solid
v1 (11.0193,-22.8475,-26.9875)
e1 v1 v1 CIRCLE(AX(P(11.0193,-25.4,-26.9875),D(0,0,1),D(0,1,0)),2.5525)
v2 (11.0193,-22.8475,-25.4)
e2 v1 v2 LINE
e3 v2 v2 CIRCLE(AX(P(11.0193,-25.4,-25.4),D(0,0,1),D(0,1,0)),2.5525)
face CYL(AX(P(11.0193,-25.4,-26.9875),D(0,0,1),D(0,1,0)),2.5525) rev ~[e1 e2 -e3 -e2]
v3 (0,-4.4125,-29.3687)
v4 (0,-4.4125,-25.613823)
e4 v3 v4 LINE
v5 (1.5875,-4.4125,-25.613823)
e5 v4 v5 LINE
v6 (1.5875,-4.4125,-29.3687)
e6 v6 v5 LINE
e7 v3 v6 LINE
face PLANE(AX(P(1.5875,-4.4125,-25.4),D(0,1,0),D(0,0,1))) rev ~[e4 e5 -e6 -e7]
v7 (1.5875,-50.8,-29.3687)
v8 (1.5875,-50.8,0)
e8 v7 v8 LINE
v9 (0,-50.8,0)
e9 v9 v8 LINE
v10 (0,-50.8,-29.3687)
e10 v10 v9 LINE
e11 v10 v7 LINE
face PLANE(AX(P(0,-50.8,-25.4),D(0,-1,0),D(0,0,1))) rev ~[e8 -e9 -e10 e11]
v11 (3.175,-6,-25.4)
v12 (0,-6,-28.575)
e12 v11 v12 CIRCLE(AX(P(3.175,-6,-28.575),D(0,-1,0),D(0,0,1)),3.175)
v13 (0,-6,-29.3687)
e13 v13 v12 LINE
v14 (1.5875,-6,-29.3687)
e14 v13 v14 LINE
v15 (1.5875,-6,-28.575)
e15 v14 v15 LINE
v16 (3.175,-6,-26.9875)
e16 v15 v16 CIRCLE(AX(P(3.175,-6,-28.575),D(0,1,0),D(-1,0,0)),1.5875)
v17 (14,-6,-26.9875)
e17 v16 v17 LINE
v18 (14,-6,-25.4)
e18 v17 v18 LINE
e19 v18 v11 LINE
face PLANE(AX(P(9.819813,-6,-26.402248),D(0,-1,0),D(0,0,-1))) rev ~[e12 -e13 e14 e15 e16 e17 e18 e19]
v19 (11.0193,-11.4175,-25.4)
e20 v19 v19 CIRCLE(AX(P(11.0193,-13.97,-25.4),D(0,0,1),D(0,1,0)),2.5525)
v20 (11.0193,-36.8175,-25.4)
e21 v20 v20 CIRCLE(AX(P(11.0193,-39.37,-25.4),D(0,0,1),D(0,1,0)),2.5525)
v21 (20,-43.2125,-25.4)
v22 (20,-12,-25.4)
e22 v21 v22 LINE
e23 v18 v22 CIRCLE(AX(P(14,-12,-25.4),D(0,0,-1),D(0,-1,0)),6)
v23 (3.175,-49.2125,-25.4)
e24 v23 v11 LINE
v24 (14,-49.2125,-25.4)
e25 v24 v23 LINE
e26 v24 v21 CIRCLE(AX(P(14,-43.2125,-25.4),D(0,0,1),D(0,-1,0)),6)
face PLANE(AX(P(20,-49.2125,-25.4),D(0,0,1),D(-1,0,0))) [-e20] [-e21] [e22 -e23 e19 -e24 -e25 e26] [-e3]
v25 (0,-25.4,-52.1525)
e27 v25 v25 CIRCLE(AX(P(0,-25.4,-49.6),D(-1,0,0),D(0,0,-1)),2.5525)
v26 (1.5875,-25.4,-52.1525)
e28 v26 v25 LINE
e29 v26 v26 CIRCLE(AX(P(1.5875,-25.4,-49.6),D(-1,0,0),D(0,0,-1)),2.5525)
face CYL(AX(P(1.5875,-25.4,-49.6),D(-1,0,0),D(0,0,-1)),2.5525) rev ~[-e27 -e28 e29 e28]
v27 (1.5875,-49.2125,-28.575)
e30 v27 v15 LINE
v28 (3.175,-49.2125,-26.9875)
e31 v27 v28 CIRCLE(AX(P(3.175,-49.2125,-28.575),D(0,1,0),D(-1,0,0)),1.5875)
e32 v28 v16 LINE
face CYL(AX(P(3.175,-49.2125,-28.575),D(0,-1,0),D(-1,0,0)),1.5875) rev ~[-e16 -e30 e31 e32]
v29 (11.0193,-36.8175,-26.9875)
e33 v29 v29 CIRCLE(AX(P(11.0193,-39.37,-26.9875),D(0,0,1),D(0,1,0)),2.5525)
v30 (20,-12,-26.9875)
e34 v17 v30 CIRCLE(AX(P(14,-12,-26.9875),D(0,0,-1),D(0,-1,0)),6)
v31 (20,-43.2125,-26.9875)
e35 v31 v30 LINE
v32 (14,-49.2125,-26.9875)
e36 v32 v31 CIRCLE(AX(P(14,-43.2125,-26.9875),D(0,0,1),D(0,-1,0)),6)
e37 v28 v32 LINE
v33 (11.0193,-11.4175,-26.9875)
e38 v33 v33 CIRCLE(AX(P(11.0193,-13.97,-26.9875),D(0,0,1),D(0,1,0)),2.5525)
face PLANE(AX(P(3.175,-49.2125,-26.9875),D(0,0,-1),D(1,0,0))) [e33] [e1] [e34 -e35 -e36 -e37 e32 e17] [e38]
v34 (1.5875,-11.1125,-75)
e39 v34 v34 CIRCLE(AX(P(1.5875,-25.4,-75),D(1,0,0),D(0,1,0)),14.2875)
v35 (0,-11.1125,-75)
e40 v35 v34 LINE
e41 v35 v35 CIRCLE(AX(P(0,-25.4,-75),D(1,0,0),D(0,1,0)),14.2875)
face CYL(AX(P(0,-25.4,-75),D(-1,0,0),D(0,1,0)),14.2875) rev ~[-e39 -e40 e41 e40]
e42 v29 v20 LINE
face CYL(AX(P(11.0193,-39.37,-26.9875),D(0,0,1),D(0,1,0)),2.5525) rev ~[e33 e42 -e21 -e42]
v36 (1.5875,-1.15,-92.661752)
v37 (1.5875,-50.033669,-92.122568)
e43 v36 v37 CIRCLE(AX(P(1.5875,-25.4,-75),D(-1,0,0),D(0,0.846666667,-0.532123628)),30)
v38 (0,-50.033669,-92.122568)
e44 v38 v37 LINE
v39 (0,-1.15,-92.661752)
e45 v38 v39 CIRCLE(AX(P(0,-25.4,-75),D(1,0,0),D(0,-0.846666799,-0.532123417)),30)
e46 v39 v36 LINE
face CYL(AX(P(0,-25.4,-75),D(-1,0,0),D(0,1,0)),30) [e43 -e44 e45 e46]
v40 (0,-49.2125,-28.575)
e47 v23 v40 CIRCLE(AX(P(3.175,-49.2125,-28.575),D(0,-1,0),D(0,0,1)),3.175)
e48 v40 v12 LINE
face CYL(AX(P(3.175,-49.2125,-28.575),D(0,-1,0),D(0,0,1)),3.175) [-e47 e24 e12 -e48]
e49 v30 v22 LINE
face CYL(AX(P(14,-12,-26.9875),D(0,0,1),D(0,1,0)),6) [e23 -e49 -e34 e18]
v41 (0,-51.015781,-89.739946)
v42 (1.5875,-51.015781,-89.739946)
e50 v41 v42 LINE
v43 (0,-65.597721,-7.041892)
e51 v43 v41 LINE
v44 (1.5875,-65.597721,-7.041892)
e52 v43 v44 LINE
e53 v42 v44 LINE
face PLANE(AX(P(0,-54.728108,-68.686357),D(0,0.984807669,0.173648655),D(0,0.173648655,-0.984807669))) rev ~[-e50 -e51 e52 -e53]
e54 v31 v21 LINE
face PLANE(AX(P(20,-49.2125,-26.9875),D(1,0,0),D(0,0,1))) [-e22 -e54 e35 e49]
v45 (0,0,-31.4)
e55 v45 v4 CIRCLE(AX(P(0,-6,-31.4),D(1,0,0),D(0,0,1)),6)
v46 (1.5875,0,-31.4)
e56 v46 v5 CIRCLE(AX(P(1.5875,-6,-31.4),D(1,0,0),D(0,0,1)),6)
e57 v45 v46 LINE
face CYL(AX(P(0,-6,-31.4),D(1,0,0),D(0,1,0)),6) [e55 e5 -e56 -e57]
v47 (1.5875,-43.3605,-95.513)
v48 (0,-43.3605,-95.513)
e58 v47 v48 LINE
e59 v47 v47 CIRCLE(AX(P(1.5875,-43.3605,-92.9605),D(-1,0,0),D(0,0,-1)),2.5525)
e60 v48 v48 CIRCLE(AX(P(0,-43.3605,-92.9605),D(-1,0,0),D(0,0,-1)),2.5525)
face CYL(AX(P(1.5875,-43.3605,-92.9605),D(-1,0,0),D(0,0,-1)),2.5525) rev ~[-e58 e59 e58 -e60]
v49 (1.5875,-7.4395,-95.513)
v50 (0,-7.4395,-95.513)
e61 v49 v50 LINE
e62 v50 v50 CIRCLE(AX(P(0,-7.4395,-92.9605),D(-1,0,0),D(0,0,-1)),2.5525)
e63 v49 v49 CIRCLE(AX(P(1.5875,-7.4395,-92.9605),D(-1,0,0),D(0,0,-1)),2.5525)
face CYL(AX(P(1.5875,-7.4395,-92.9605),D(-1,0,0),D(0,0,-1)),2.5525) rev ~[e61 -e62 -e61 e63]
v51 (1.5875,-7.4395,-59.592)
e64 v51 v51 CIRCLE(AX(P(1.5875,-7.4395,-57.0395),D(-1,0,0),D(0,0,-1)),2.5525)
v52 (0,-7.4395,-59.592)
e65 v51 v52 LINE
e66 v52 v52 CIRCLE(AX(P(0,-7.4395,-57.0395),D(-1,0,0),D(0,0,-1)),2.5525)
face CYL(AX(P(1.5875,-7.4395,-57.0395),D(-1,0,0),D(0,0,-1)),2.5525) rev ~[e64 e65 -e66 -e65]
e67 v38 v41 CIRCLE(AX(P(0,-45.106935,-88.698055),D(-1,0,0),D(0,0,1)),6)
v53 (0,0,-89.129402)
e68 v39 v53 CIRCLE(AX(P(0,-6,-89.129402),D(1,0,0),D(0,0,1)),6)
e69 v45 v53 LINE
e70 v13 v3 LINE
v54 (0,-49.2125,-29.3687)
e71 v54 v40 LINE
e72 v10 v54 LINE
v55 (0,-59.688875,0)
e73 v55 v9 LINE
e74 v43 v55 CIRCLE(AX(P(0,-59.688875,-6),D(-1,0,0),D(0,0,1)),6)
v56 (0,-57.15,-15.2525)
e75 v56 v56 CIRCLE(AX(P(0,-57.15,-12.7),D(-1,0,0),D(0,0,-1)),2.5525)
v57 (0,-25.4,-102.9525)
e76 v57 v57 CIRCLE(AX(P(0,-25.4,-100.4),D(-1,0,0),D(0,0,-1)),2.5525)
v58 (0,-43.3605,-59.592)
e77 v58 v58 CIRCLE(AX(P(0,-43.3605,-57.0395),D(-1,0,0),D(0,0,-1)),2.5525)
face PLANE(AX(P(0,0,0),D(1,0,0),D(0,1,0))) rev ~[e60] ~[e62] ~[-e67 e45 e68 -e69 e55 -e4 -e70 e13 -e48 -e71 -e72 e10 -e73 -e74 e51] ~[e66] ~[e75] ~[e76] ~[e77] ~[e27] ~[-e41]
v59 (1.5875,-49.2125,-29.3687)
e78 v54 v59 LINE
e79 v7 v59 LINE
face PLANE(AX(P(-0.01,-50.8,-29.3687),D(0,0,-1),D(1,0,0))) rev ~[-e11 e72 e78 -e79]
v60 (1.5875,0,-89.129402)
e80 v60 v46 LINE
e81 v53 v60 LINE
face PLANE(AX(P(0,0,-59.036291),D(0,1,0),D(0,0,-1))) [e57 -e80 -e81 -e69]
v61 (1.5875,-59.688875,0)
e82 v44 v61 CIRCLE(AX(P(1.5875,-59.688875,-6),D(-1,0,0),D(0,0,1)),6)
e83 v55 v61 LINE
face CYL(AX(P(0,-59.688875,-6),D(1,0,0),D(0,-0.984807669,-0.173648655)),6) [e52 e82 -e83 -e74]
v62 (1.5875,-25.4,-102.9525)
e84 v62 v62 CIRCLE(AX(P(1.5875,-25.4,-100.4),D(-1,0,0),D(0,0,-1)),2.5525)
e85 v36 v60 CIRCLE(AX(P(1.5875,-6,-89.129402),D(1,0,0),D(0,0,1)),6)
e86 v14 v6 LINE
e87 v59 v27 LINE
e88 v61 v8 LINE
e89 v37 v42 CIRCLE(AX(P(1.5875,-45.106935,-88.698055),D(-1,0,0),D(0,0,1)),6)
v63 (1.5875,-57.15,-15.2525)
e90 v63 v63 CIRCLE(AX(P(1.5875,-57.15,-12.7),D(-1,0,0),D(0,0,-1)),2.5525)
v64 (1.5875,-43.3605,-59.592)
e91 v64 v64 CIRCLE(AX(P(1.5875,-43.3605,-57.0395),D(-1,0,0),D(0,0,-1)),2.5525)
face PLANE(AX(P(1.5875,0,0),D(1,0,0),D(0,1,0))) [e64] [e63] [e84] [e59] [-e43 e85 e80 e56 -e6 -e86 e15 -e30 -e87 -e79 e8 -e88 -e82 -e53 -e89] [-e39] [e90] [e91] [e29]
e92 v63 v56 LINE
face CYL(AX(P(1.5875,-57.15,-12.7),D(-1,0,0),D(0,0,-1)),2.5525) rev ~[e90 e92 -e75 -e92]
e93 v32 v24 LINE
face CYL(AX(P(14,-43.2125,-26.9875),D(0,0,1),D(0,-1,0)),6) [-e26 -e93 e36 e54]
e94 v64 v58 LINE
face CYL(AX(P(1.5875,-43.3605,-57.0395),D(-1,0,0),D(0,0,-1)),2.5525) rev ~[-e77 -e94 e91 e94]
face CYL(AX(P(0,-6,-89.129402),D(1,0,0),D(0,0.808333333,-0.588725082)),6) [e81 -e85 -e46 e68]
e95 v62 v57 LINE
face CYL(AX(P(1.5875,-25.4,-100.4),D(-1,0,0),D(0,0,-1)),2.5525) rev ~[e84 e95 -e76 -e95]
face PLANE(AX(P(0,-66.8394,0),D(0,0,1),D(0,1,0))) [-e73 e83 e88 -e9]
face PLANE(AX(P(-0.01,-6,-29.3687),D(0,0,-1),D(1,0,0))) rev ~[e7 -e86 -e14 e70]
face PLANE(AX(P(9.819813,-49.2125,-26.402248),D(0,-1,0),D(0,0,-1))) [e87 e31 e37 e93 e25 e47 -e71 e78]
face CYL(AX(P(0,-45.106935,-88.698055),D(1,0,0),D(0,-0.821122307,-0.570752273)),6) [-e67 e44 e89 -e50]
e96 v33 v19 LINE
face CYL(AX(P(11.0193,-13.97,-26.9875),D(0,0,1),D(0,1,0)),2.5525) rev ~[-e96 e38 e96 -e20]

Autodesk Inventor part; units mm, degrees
ref_plane "YZ Plane" through (0, 0, 0) normal (1, 0, 0) x (0, 1, 0)
ref_plane "XZ Plane" through (0, 0, 0) normal (0, 1, 0) x (-1, 0, 0)
ref_plane "XY Plane" through (0, 0, 0) normal (0, 0, 1) x (1, 0, 0)
sketch "Sketch1" plane through (0, 0, 0) normal (1, 0, 0) x (0, 1, 0)
  line L0 (-39.3892, -105) -> (-110, -20.8494)
  line L1 (-110, -20.8494) -> (-110, 0)
  line L2 (-110, 0) -> (0, 0)
  line L3 (0, 0) -> (0, -105)
  line L4 (0, -105) -> (-39.3892, -105)
  line L5 (-110, -20.8494) -> (-119.38, 0) construction
  line L6 (-119.38, 0) -> (-110, 0) construction
  line L7 (-50.8, -25.4) -> (0, -25.4) construction
  line L8 (0, -25.4) -> (0, 0) construction
  line L9 (0, 0) -> (-50.8, 0) construction
  line L10 (-50.8, 0) -> (-50.8, -25.4) construction
  line L11 (-50.8, -25.4) -> (0, 0) construction
  line L12 (0, -25.4) -> (-50.8, 0) construction
  circle A0 centre (-12.7, -12.7) radius 3
  circle A1 centre (-38.1, -12.7) radius 3
  circle A2 centre (-25.4, -75) radius 14.2875
  circle A3 centre (-25.4, -75) radius 30
  line L13 (-50.8, -90.9637) -> (-50.8, -59.0363)
  line L14 (-50.8, -25.4) -> (0, -25.4)
  line L15 (-66.8394, 0) -> (-50.8, -90.9637)
  line L16 (-50.8, -25.4) -> (-50.8, 0)
  point P0 (-25.4, -12.7)
  point P1 (-25.4, -25.4)
  point P2 (-50.8, -75)
  point P3 (0, -90.9637)
  point P4 (0, -25.4)
  point P5 (-50.8, 0)
  dimension "d0" = 50
  dimension "d1" = 119.38
  dimension "d2" = 50.8
  dimension "d3" = 25.4
  dimension "d4" = 25.4
  dimension "d5" = 12.7
  dimension "d6" = 6
  dimension "d7" = 6
  dimension "d11" = 75
  dimension "d13" = 110
  dimension "d16" = 60
  dimension "d17" = 25.4
  dimension "d18" = 25.4
  dimension "d31" = 28.575
  dimension "d33" = 10
extrude "Plate1" add sketch "Sketch1" along normal blind 1.5875 contours A3 L13 L3 | L15 A3 L13 | L15 L2 L16 L14 L3 A3
fillet "Corner Round2" radius 6 4 edges at (0.7937, 0, -90.9637) (0.7937, -50.8, -90.9637) (0.7937, 0, -25.4) (0.7937, -66.8394, 0)
sketch "Sketch3" plane through (0, -50.8, -26.9875) normal (0, 0, 1) x (1, 0, 0)
  line L0 (0, 44.8) -> (0, 1.5875)
  line L1 (0, 1.5875) -> (20, 1.5875)
  line L2 (20, 1.5875) -> (20, 44.8)
  line L3 (20, 44.8) -> (0, 44.8)
edge flange "Flange1" height 20 angle 90 thickness 1.5875 bend radius 1.5875 thickness toward (0, 0, 1) relief straight relief width 1.5875 relief depth 0.7937 edges at (1.5875, -28.4, -25.4) wall of the first edge with corners at (0, -6, -26.9875) (0, -49.2125, -26.9875) (20, -49.2125, -26.9875) (20, -6, -26.9875)
bend "Bend1"
corner "Corner1"
sketch "Sketch4" plane through (1.5875, 0, 0) normal (1, 0, 0) x (0, 0, -1)
  circle A0 centre (75, -25.4) radius 14.2875 projected
  point P0 (0, 0)
  point P1 (100.4, -25.4)
  point P2 (92.9605, -7.4395)
  point P3 (75, 0)
  point P4 (57.0395, -7.4395)
  point P5 (49.6, -25.4)
  point P6 (57.0395, -43.3605)
  point P7 (75, -50.8)
  point P8 (92.9605, -43.3605)
  dimension "d45" = 25.4
  dimension "d48" = 360
hole "Hole2" at (1.5875, -25.4, -100.4) at (1.5875, -7.4395, -92.9605) at (1.5875, -7.4395, -57.0395) at (1.5875, -25.4, -49.6) at (1.5875, -43.3605, -57.0395) at (1.5875, -43.3605, -92.9605) direction (-1, 0, 0) diameter 5.105 depth 1.5875 tip angle 118 clearance for "Flat Head Machine Screw (82)" size "#10" standard "Ansi Unified Screw Threads"
sketch "Sketch5" plane through (20, -49.2125, -26.9875) normal (0, 0, -1) x (-1, 0, 0)
  line L0 (0, 0) -> (16.825, 0) projected
  line L1 (16.825, 0) -> (16.825, 43.2125) projected
  point P0 (20, 49.2125)
  point P1 (8.9807, 9.8425)
  point P2 (8.9807, 35.2425)
  point P3 (8.4125, 0)
  point P4 (8.9807, 23.8125)
  dimension "d57" = 25.4
  dimension "d58" = 9.8425
  dimension "d67" = 23.8125
  dimension "d68" = 7.8443
hole "Hole3" at (11.0193, -39.37, -26.9875) at (11.0193, -13.97, -26.9875) at (11.0193, -25.4, -26.9875) direction (0, 0, 1) diameter 5.105 end through all clearance for "Flat Head Machine Screw (82)" size "#10" standard "Ansi Unified Screw Threads"
fillet "Corner Round3" radius 6 2 edges at (20, -49.2125, -26.1938) (20, -6, -26.1937)
sketch "Sketch6" plane through (1.5875, 0, 0) normal (1, 0, 0) x (0, 0, -1)
  line L0 (29.3688, -50.8) -> (0, -50.8) projected
  line L1 (0, -59.6888) -> (0, -50.8) projected
  point P0 (0, 0)
  point P1 (12.7, -57.15)
  dimension "d69" = 6.35
  dimension "d70" = 12.7
hole "Hole4" at (1.5875, -57.15, -12.7) direction (-1, 0, 0) diameter 5.105 end through all clearance for "Flat Head Machine Screw (82)" size "#10" standard "Ansi Unified Screw Threads"
equation "\"d5\" = 0.5 * d4"
equation "\"d7\" = d6"
equation "\"d55\" = Thickness"
equation "\"d76\" = Thickness"
equation "\"d14\" = Thickness"
equation "\"d35\" = BendReliefWidth"
equation "\"d36\" = BendReliefDepth"
equation "\"d37\" = MinimumRemnant"
equation "\"d38\" = TransitionRadius"
equation "\"d41\" = BendRadius"
equation "\"d42\" = CornerReliefSize"
equation "\"d43\" = GapSize"
equation "\"d44\" = JacobiRadiusSize"
equation "\"d18\" = d17"
equation "\"BendRadius\" = Thickness"
equation "\"BendReliefWidth\" = Thickness"
equation "\"BendReliefDepth\" = 0.5 * Thickness"
equation "\"CornerReliefSize\" = 4 * Thickness"
equation "\"MinimumRemnant\" = 2 * Thickness"
equation "\"TransitionRadius\" = BendRadius"
equation "\"JacobiRadiusSize\" = BendRadius"
equation "\"GapSize\" = Thickness"
equation "\"Thickness\" = 1.5875"
properties part number "INSIDE_INTAKE_PLATE_MOTOR_MOUNT" material "Aluminum, 6061-T6"
